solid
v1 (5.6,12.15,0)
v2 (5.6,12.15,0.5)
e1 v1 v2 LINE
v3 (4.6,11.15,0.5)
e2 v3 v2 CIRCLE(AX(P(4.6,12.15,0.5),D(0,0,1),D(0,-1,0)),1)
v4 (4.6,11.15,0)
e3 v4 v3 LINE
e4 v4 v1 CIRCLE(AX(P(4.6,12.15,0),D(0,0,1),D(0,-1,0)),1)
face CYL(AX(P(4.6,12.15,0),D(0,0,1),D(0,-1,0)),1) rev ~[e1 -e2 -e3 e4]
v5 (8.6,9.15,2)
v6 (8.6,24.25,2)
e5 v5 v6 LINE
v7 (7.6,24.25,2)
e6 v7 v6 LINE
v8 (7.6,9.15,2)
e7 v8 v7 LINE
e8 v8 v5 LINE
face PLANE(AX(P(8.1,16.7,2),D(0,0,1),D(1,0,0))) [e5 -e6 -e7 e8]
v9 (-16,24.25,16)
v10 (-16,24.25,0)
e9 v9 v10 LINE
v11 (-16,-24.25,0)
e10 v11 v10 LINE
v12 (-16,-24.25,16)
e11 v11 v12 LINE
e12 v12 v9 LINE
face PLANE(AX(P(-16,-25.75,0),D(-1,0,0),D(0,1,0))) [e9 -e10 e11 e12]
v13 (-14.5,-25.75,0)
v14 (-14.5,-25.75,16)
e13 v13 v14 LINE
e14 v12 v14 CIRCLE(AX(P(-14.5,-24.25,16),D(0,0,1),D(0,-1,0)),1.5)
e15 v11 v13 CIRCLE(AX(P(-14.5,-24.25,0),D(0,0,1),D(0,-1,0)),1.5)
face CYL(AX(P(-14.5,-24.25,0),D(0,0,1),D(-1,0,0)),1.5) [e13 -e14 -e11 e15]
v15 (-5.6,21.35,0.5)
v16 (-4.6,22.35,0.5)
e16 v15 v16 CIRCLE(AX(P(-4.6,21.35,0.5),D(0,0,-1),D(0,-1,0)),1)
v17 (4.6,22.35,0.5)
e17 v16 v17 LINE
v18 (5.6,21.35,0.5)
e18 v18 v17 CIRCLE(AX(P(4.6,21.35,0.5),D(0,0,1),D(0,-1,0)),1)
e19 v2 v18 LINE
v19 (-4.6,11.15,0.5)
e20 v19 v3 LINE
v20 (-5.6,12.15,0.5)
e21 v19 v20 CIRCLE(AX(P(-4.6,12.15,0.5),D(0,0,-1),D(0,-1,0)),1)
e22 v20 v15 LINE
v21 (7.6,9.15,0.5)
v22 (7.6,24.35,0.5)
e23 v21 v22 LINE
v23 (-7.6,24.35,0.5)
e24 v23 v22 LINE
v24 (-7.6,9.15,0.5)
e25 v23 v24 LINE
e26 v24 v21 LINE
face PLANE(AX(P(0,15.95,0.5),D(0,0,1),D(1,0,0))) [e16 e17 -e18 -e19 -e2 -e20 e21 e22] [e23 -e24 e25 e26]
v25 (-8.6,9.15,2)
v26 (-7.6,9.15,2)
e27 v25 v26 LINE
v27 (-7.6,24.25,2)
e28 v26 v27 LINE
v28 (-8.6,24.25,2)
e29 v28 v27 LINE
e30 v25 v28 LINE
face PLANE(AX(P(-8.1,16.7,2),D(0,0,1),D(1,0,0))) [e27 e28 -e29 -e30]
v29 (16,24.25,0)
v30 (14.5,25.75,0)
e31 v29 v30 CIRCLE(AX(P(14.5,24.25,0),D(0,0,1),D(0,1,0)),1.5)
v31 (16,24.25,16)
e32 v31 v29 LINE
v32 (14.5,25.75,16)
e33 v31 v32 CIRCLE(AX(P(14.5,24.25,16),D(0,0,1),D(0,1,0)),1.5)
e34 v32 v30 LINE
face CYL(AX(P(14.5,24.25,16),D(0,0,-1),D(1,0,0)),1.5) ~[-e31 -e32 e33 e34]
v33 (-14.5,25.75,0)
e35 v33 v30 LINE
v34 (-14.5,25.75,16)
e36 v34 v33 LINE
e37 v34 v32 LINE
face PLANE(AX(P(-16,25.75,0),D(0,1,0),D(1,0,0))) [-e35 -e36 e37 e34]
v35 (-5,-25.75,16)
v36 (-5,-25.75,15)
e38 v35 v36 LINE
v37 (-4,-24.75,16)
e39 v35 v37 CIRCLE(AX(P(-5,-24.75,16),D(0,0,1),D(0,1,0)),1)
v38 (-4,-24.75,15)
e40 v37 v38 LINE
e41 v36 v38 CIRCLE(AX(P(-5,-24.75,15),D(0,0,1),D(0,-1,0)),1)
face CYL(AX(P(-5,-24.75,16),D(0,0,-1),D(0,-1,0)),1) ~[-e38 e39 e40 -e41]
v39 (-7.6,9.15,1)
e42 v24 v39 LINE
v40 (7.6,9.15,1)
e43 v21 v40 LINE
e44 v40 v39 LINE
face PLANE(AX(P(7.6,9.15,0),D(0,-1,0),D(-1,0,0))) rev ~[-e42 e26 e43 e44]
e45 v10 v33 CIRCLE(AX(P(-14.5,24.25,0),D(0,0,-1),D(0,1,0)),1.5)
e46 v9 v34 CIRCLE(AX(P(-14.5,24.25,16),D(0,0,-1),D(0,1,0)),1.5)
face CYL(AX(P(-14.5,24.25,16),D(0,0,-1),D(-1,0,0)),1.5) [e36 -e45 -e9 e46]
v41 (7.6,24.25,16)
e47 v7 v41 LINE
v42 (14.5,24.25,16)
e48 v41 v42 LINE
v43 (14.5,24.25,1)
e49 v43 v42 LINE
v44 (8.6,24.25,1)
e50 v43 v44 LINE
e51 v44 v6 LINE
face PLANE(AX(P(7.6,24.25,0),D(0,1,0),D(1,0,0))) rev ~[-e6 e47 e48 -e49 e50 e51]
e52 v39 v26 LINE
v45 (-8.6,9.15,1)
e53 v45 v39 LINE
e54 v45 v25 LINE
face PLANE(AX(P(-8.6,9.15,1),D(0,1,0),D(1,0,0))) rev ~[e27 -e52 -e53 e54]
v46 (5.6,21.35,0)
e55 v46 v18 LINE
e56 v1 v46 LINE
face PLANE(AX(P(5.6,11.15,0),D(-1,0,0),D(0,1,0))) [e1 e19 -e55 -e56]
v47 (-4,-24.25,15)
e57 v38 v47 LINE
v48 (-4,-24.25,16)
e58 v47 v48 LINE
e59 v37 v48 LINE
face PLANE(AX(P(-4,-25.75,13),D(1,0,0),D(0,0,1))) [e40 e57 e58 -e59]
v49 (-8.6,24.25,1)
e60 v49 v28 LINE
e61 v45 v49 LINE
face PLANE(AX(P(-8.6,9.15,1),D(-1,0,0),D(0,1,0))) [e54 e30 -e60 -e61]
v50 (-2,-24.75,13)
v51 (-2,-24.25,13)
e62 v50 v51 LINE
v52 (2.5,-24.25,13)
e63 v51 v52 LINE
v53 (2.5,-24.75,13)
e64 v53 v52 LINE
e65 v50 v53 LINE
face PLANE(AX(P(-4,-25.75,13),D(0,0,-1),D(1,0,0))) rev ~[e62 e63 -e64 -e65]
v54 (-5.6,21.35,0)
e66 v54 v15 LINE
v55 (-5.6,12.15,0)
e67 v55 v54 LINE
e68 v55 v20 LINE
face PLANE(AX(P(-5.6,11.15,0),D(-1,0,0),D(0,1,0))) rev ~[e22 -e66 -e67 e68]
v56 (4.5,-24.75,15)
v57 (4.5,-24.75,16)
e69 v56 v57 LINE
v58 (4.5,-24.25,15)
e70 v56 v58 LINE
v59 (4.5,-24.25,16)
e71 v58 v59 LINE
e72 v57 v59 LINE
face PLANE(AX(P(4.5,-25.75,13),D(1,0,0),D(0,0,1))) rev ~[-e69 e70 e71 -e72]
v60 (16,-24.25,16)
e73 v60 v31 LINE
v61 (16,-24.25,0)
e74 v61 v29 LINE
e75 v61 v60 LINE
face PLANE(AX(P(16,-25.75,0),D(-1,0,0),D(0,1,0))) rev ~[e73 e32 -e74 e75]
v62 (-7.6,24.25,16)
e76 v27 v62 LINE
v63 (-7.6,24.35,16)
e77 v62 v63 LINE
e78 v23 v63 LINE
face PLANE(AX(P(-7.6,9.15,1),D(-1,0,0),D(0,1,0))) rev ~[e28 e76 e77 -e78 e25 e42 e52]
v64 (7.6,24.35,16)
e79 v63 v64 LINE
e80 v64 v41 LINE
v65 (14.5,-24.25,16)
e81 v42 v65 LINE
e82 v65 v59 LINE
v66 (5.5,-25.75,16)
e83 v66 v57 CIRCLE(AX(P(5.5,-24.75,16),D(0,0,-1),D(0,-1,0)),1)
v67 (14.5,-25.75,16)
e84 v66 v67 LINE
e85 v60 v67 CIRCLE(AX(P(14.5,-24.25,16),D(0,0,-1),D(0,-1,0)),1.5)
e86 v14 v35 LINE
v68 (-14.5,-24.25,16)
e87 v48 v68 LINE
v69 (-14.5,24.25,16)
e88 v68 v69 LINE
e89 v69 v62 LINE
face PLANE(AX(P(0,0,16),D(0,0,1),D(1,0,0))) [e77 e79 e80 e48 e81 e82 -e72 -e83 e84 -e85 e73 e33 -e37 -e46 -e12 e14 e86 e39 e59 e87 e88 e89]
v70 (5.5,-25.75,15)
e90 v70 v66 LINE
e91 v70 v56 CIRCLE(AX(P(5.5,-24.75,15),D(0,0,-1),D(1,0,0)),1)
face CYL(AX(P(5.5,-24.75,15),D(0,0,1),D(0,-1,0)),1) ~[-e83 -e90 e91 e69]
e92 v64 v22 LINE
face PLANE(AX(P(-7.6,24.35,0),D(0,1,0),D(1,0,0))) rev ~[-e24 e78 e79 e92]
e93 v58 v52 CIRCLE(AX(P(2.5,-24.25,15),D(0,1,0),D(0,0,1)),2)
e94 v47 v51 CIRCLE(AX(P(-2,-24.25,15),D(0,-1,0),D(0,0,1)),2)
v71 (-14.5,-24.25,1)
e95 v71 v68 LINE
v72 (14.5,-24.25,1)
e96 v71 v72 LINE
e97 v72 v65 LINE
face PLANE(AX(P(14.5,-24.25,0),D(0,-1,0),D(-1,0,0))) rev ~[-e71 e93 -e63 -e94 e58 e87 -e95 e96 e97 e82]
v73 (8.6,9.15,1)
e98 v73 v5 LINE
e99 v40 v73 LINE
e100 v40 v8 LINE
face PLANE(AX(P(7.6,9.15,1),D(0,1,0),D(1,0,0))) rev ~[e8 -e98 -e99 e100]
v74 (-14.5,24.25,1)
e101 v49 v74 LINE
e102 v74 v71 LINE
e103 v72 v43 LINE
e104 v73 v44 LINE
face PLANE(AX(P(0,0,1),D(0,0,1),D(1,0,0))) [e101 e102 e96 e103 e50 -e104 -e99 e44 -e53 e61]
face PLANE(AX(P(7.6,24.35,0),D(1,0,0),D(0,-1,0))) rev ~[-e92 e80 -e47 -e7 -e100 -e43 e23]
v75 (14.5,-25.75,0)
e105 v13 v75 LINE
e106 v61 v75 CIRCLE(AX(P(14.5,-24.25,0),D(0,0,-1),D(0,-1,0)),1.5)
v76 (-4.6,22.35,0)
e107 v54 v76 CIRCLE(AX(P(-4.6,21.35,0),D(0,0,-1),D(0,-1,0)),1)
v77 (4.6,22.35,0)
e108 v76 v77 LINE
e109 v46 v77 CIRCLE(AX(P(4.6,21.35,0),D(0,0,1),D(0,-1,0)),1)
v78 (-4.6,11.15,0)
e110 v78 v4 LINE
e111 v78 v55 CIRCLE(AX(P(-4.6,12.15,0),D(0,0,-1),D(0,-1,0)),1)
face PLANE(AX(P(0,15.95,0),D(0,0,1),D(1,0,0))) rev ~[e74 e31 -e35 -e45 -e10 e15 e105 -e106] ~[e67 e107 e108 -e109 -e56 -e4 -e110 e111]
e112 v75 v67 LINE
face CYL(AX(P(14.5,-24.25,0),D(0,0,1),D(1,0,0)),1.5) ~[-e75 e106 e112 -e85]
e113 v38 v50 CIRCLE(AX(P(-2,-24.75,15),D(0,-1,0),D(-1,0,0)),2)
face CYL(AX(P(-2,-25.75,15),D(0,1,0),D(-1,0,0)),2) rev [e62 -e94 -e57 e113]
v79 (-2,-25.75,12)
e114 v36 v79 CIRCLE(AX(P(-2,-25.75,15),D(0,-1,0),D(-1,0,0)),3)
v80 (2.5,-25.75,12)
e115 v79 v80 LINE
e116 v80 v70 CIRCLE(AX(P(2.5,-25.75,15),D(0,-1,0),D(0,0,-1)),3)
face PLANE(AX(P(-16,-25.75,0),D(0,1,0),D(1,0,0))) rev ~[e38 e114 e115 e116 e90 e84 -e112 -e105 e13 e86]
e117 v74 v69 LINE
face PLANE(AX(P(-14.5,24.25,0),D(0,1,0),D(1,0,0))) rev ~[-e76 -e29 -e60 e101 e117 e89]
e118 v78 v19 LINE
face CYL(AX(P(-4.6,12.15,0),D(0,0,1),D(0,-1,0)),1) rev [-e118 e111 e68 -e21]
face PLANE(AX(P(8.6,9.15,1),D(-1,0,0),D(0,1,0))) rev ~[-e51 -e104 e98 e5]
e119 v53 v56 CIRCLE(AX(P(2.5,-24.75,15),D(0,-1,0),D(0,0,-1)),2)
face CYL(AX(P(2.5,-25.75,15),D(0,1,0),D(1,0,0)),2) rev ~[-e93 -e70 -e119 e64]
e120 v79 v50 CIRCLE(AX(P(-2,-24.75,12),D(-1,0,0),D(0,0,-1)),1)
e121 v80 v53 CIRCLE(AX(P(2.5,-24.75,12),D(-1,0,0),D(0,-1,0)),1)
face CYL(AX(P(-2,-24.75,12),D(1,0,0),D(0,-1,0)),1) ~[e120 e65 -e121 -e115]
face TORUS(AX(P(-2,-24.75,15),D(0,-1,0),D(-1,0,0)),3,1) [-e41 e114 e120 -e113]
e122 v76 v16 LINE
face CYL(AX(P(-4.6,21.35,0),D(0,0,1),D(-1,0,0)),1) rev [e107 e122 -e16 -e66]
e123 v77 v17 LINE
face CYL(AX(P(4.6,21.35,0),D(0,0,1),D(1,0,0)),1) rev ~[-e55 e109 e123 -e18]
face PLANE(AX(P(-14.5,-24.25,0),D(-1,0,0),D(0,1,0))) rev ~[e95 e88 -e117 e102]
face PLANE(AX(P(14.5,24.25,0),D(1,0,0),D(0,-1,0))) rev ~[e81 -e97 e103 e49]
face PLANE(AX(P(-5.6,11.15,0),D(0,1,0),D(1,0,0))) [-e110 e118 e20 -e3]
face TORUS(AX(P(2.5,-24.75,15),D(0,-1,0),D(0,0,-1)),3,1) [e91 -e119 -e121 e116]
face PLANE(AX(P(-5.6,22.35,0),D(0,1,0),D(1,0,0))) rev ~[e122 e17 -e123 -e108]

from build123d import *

# Parameters (mm, degrees)
F0_W      = 32
F0_H      = 51.5
F1_DEPTH  = 1
F2_DEPTH  = 16
F3_R      = 1.5
F4_W      = 8.5
F4_H      = 3
F5_DEPTH  = 5
F6_R      = 2
F7_R      = 1
F0_W_2    = 15.2
F0_H_2    = 13.6
F0_W_3    = 11.1999999404
F0_H_3    = 11.1999999404
F0_H_4    = 0.1
F0_H_5    = 1.5
F8_DEPTH  = 0.5
F9_R      = 1
F10_W     = 1
F10_H     = 15.1
F11_DEPTH = 1


with BuildPart() as f1:
    # F0 (on Top) → F1 (new body)
    with BuildSketch(Plane.XY):
        Rectangle(F0_W, F0_H)
        Polygon((7.6, 24.35), (7.6, 24.25), (14.5, 24.25), (14.5, -24.25), (-14.5, -24.25), (-14.5, 24.25), (-7.6, 24.25), (-7.6, 24.35), align=None, mode=Mode.SUBTRACT)
        Polygon((13, 22.75), (13, -22.75), (-13, -22.75), (-13, 22.75), (-7.6, 22.75), (-7.6, 24.25), (-14.5, 24.25), (-14.5, -24.25), (14.5, -24.25), (14.5, 24.25), (7.6, 24.25), (7.6, 22.75), align=None)
        Polygon((-13, -22.75), (13, -22.75), (13, 22.75), (7.6, 22.75), (7.6, 9.15), (-7.6, 9.15), (-7.6, 22.75), (-13, 22.75), align=None)
    extrude(amount=F1_DEPTH)

    # F0 (on Top) → F2 (join)
    with BuildSketch(Plane.XY):
        Rectangle(F0_W, F0_H)
        Polygon((7.6, 24.35), (7.6, 24.25), (14.5, 24.25), (14.5, -24.25), (-14.5, -24.25), (-14.5, 24.25), (-7.6, 24.25), (-7.6, 24.35), align=None, mode=Mode.SUBTRACT)
    extrude(amount=F2_DEPTH)

    # F3
    f3_edges = [f1.edges().sort_by_distance(p)[0] for p in [
        (-16, -25.75, 8),
        (16, -25.75, 8),
        (-16, 25.75, 8),
        (16, 25.75, 8),
    ]]
    fillet(f3_edges, radius=F3_R)

    # F4 (on face) → F5 (cut)
    with BuildSketch(Plane.XZ.offset(25.75)):
        with Locations((0.25, 14.5)):
            Rectangle(F4_W, F4_H)
    extrude(amount=-F5_DEPTH, mode=Mode.SUBTRACT)

    # F6
    f6_edges = [f1.edges().sort_by_distance(p)[0] for p in [
        (-4, -25, 13),
        (4.5, -25, 13),
    ]]
    fillet(f6_edges, radius=F6_R)

    # F7
    f7_edges = [f1.edges().sort_by_distance(p)[0] for p in [
        (-3.414214, -25.75, 13.585786),
        (0.25, -25.75, 13),
    ]]
    fillet(f7_edges, radius=F7_R)

    # F0 (on Top) → F8 (join)
    with BuildSketch(Plane.XY):
        with Locations((0, 15.95)):
            Rectangle(F0_W_2, F0_H_2)
        with Locations((0, 16.75)):
            Rectangle(F0_W_3, F0_H_3, mode=Mode.SUBTRACT)
        with Locations((0, 24.3)):
            Rectangle(F0_W_2, F0_H_4)
        with Locations((0, 23.5)):
            Rectangle(F0_W_2, F0_H_5)
    extrude(amount=F8_DEPTH)

    # F9
    f9_edges = [f1.edges().sort_by_distance(p)[0] for p in [
        (5.6, 11.15, 0.25),
        (-5.6, 11.15, 0.25),
        (5.6, 22.35, 0.25),
        (-5.6, 22.35, 0.25),
    ]]
    fillet(f9_edges, radius=F9_R)

    # F10 (on face) → F11 (join)
    with BuildSketch(Plane.XY.offset(1)):
        with Locations((-8.1, 16.7)):
            Rectangle(F10_W, F10_H)
        with Locations((8.1, 16.7)):
            Rectangle(F10_W, F10_H)
    extrude(amount=F11_DEPTH)


solid = f1.part
